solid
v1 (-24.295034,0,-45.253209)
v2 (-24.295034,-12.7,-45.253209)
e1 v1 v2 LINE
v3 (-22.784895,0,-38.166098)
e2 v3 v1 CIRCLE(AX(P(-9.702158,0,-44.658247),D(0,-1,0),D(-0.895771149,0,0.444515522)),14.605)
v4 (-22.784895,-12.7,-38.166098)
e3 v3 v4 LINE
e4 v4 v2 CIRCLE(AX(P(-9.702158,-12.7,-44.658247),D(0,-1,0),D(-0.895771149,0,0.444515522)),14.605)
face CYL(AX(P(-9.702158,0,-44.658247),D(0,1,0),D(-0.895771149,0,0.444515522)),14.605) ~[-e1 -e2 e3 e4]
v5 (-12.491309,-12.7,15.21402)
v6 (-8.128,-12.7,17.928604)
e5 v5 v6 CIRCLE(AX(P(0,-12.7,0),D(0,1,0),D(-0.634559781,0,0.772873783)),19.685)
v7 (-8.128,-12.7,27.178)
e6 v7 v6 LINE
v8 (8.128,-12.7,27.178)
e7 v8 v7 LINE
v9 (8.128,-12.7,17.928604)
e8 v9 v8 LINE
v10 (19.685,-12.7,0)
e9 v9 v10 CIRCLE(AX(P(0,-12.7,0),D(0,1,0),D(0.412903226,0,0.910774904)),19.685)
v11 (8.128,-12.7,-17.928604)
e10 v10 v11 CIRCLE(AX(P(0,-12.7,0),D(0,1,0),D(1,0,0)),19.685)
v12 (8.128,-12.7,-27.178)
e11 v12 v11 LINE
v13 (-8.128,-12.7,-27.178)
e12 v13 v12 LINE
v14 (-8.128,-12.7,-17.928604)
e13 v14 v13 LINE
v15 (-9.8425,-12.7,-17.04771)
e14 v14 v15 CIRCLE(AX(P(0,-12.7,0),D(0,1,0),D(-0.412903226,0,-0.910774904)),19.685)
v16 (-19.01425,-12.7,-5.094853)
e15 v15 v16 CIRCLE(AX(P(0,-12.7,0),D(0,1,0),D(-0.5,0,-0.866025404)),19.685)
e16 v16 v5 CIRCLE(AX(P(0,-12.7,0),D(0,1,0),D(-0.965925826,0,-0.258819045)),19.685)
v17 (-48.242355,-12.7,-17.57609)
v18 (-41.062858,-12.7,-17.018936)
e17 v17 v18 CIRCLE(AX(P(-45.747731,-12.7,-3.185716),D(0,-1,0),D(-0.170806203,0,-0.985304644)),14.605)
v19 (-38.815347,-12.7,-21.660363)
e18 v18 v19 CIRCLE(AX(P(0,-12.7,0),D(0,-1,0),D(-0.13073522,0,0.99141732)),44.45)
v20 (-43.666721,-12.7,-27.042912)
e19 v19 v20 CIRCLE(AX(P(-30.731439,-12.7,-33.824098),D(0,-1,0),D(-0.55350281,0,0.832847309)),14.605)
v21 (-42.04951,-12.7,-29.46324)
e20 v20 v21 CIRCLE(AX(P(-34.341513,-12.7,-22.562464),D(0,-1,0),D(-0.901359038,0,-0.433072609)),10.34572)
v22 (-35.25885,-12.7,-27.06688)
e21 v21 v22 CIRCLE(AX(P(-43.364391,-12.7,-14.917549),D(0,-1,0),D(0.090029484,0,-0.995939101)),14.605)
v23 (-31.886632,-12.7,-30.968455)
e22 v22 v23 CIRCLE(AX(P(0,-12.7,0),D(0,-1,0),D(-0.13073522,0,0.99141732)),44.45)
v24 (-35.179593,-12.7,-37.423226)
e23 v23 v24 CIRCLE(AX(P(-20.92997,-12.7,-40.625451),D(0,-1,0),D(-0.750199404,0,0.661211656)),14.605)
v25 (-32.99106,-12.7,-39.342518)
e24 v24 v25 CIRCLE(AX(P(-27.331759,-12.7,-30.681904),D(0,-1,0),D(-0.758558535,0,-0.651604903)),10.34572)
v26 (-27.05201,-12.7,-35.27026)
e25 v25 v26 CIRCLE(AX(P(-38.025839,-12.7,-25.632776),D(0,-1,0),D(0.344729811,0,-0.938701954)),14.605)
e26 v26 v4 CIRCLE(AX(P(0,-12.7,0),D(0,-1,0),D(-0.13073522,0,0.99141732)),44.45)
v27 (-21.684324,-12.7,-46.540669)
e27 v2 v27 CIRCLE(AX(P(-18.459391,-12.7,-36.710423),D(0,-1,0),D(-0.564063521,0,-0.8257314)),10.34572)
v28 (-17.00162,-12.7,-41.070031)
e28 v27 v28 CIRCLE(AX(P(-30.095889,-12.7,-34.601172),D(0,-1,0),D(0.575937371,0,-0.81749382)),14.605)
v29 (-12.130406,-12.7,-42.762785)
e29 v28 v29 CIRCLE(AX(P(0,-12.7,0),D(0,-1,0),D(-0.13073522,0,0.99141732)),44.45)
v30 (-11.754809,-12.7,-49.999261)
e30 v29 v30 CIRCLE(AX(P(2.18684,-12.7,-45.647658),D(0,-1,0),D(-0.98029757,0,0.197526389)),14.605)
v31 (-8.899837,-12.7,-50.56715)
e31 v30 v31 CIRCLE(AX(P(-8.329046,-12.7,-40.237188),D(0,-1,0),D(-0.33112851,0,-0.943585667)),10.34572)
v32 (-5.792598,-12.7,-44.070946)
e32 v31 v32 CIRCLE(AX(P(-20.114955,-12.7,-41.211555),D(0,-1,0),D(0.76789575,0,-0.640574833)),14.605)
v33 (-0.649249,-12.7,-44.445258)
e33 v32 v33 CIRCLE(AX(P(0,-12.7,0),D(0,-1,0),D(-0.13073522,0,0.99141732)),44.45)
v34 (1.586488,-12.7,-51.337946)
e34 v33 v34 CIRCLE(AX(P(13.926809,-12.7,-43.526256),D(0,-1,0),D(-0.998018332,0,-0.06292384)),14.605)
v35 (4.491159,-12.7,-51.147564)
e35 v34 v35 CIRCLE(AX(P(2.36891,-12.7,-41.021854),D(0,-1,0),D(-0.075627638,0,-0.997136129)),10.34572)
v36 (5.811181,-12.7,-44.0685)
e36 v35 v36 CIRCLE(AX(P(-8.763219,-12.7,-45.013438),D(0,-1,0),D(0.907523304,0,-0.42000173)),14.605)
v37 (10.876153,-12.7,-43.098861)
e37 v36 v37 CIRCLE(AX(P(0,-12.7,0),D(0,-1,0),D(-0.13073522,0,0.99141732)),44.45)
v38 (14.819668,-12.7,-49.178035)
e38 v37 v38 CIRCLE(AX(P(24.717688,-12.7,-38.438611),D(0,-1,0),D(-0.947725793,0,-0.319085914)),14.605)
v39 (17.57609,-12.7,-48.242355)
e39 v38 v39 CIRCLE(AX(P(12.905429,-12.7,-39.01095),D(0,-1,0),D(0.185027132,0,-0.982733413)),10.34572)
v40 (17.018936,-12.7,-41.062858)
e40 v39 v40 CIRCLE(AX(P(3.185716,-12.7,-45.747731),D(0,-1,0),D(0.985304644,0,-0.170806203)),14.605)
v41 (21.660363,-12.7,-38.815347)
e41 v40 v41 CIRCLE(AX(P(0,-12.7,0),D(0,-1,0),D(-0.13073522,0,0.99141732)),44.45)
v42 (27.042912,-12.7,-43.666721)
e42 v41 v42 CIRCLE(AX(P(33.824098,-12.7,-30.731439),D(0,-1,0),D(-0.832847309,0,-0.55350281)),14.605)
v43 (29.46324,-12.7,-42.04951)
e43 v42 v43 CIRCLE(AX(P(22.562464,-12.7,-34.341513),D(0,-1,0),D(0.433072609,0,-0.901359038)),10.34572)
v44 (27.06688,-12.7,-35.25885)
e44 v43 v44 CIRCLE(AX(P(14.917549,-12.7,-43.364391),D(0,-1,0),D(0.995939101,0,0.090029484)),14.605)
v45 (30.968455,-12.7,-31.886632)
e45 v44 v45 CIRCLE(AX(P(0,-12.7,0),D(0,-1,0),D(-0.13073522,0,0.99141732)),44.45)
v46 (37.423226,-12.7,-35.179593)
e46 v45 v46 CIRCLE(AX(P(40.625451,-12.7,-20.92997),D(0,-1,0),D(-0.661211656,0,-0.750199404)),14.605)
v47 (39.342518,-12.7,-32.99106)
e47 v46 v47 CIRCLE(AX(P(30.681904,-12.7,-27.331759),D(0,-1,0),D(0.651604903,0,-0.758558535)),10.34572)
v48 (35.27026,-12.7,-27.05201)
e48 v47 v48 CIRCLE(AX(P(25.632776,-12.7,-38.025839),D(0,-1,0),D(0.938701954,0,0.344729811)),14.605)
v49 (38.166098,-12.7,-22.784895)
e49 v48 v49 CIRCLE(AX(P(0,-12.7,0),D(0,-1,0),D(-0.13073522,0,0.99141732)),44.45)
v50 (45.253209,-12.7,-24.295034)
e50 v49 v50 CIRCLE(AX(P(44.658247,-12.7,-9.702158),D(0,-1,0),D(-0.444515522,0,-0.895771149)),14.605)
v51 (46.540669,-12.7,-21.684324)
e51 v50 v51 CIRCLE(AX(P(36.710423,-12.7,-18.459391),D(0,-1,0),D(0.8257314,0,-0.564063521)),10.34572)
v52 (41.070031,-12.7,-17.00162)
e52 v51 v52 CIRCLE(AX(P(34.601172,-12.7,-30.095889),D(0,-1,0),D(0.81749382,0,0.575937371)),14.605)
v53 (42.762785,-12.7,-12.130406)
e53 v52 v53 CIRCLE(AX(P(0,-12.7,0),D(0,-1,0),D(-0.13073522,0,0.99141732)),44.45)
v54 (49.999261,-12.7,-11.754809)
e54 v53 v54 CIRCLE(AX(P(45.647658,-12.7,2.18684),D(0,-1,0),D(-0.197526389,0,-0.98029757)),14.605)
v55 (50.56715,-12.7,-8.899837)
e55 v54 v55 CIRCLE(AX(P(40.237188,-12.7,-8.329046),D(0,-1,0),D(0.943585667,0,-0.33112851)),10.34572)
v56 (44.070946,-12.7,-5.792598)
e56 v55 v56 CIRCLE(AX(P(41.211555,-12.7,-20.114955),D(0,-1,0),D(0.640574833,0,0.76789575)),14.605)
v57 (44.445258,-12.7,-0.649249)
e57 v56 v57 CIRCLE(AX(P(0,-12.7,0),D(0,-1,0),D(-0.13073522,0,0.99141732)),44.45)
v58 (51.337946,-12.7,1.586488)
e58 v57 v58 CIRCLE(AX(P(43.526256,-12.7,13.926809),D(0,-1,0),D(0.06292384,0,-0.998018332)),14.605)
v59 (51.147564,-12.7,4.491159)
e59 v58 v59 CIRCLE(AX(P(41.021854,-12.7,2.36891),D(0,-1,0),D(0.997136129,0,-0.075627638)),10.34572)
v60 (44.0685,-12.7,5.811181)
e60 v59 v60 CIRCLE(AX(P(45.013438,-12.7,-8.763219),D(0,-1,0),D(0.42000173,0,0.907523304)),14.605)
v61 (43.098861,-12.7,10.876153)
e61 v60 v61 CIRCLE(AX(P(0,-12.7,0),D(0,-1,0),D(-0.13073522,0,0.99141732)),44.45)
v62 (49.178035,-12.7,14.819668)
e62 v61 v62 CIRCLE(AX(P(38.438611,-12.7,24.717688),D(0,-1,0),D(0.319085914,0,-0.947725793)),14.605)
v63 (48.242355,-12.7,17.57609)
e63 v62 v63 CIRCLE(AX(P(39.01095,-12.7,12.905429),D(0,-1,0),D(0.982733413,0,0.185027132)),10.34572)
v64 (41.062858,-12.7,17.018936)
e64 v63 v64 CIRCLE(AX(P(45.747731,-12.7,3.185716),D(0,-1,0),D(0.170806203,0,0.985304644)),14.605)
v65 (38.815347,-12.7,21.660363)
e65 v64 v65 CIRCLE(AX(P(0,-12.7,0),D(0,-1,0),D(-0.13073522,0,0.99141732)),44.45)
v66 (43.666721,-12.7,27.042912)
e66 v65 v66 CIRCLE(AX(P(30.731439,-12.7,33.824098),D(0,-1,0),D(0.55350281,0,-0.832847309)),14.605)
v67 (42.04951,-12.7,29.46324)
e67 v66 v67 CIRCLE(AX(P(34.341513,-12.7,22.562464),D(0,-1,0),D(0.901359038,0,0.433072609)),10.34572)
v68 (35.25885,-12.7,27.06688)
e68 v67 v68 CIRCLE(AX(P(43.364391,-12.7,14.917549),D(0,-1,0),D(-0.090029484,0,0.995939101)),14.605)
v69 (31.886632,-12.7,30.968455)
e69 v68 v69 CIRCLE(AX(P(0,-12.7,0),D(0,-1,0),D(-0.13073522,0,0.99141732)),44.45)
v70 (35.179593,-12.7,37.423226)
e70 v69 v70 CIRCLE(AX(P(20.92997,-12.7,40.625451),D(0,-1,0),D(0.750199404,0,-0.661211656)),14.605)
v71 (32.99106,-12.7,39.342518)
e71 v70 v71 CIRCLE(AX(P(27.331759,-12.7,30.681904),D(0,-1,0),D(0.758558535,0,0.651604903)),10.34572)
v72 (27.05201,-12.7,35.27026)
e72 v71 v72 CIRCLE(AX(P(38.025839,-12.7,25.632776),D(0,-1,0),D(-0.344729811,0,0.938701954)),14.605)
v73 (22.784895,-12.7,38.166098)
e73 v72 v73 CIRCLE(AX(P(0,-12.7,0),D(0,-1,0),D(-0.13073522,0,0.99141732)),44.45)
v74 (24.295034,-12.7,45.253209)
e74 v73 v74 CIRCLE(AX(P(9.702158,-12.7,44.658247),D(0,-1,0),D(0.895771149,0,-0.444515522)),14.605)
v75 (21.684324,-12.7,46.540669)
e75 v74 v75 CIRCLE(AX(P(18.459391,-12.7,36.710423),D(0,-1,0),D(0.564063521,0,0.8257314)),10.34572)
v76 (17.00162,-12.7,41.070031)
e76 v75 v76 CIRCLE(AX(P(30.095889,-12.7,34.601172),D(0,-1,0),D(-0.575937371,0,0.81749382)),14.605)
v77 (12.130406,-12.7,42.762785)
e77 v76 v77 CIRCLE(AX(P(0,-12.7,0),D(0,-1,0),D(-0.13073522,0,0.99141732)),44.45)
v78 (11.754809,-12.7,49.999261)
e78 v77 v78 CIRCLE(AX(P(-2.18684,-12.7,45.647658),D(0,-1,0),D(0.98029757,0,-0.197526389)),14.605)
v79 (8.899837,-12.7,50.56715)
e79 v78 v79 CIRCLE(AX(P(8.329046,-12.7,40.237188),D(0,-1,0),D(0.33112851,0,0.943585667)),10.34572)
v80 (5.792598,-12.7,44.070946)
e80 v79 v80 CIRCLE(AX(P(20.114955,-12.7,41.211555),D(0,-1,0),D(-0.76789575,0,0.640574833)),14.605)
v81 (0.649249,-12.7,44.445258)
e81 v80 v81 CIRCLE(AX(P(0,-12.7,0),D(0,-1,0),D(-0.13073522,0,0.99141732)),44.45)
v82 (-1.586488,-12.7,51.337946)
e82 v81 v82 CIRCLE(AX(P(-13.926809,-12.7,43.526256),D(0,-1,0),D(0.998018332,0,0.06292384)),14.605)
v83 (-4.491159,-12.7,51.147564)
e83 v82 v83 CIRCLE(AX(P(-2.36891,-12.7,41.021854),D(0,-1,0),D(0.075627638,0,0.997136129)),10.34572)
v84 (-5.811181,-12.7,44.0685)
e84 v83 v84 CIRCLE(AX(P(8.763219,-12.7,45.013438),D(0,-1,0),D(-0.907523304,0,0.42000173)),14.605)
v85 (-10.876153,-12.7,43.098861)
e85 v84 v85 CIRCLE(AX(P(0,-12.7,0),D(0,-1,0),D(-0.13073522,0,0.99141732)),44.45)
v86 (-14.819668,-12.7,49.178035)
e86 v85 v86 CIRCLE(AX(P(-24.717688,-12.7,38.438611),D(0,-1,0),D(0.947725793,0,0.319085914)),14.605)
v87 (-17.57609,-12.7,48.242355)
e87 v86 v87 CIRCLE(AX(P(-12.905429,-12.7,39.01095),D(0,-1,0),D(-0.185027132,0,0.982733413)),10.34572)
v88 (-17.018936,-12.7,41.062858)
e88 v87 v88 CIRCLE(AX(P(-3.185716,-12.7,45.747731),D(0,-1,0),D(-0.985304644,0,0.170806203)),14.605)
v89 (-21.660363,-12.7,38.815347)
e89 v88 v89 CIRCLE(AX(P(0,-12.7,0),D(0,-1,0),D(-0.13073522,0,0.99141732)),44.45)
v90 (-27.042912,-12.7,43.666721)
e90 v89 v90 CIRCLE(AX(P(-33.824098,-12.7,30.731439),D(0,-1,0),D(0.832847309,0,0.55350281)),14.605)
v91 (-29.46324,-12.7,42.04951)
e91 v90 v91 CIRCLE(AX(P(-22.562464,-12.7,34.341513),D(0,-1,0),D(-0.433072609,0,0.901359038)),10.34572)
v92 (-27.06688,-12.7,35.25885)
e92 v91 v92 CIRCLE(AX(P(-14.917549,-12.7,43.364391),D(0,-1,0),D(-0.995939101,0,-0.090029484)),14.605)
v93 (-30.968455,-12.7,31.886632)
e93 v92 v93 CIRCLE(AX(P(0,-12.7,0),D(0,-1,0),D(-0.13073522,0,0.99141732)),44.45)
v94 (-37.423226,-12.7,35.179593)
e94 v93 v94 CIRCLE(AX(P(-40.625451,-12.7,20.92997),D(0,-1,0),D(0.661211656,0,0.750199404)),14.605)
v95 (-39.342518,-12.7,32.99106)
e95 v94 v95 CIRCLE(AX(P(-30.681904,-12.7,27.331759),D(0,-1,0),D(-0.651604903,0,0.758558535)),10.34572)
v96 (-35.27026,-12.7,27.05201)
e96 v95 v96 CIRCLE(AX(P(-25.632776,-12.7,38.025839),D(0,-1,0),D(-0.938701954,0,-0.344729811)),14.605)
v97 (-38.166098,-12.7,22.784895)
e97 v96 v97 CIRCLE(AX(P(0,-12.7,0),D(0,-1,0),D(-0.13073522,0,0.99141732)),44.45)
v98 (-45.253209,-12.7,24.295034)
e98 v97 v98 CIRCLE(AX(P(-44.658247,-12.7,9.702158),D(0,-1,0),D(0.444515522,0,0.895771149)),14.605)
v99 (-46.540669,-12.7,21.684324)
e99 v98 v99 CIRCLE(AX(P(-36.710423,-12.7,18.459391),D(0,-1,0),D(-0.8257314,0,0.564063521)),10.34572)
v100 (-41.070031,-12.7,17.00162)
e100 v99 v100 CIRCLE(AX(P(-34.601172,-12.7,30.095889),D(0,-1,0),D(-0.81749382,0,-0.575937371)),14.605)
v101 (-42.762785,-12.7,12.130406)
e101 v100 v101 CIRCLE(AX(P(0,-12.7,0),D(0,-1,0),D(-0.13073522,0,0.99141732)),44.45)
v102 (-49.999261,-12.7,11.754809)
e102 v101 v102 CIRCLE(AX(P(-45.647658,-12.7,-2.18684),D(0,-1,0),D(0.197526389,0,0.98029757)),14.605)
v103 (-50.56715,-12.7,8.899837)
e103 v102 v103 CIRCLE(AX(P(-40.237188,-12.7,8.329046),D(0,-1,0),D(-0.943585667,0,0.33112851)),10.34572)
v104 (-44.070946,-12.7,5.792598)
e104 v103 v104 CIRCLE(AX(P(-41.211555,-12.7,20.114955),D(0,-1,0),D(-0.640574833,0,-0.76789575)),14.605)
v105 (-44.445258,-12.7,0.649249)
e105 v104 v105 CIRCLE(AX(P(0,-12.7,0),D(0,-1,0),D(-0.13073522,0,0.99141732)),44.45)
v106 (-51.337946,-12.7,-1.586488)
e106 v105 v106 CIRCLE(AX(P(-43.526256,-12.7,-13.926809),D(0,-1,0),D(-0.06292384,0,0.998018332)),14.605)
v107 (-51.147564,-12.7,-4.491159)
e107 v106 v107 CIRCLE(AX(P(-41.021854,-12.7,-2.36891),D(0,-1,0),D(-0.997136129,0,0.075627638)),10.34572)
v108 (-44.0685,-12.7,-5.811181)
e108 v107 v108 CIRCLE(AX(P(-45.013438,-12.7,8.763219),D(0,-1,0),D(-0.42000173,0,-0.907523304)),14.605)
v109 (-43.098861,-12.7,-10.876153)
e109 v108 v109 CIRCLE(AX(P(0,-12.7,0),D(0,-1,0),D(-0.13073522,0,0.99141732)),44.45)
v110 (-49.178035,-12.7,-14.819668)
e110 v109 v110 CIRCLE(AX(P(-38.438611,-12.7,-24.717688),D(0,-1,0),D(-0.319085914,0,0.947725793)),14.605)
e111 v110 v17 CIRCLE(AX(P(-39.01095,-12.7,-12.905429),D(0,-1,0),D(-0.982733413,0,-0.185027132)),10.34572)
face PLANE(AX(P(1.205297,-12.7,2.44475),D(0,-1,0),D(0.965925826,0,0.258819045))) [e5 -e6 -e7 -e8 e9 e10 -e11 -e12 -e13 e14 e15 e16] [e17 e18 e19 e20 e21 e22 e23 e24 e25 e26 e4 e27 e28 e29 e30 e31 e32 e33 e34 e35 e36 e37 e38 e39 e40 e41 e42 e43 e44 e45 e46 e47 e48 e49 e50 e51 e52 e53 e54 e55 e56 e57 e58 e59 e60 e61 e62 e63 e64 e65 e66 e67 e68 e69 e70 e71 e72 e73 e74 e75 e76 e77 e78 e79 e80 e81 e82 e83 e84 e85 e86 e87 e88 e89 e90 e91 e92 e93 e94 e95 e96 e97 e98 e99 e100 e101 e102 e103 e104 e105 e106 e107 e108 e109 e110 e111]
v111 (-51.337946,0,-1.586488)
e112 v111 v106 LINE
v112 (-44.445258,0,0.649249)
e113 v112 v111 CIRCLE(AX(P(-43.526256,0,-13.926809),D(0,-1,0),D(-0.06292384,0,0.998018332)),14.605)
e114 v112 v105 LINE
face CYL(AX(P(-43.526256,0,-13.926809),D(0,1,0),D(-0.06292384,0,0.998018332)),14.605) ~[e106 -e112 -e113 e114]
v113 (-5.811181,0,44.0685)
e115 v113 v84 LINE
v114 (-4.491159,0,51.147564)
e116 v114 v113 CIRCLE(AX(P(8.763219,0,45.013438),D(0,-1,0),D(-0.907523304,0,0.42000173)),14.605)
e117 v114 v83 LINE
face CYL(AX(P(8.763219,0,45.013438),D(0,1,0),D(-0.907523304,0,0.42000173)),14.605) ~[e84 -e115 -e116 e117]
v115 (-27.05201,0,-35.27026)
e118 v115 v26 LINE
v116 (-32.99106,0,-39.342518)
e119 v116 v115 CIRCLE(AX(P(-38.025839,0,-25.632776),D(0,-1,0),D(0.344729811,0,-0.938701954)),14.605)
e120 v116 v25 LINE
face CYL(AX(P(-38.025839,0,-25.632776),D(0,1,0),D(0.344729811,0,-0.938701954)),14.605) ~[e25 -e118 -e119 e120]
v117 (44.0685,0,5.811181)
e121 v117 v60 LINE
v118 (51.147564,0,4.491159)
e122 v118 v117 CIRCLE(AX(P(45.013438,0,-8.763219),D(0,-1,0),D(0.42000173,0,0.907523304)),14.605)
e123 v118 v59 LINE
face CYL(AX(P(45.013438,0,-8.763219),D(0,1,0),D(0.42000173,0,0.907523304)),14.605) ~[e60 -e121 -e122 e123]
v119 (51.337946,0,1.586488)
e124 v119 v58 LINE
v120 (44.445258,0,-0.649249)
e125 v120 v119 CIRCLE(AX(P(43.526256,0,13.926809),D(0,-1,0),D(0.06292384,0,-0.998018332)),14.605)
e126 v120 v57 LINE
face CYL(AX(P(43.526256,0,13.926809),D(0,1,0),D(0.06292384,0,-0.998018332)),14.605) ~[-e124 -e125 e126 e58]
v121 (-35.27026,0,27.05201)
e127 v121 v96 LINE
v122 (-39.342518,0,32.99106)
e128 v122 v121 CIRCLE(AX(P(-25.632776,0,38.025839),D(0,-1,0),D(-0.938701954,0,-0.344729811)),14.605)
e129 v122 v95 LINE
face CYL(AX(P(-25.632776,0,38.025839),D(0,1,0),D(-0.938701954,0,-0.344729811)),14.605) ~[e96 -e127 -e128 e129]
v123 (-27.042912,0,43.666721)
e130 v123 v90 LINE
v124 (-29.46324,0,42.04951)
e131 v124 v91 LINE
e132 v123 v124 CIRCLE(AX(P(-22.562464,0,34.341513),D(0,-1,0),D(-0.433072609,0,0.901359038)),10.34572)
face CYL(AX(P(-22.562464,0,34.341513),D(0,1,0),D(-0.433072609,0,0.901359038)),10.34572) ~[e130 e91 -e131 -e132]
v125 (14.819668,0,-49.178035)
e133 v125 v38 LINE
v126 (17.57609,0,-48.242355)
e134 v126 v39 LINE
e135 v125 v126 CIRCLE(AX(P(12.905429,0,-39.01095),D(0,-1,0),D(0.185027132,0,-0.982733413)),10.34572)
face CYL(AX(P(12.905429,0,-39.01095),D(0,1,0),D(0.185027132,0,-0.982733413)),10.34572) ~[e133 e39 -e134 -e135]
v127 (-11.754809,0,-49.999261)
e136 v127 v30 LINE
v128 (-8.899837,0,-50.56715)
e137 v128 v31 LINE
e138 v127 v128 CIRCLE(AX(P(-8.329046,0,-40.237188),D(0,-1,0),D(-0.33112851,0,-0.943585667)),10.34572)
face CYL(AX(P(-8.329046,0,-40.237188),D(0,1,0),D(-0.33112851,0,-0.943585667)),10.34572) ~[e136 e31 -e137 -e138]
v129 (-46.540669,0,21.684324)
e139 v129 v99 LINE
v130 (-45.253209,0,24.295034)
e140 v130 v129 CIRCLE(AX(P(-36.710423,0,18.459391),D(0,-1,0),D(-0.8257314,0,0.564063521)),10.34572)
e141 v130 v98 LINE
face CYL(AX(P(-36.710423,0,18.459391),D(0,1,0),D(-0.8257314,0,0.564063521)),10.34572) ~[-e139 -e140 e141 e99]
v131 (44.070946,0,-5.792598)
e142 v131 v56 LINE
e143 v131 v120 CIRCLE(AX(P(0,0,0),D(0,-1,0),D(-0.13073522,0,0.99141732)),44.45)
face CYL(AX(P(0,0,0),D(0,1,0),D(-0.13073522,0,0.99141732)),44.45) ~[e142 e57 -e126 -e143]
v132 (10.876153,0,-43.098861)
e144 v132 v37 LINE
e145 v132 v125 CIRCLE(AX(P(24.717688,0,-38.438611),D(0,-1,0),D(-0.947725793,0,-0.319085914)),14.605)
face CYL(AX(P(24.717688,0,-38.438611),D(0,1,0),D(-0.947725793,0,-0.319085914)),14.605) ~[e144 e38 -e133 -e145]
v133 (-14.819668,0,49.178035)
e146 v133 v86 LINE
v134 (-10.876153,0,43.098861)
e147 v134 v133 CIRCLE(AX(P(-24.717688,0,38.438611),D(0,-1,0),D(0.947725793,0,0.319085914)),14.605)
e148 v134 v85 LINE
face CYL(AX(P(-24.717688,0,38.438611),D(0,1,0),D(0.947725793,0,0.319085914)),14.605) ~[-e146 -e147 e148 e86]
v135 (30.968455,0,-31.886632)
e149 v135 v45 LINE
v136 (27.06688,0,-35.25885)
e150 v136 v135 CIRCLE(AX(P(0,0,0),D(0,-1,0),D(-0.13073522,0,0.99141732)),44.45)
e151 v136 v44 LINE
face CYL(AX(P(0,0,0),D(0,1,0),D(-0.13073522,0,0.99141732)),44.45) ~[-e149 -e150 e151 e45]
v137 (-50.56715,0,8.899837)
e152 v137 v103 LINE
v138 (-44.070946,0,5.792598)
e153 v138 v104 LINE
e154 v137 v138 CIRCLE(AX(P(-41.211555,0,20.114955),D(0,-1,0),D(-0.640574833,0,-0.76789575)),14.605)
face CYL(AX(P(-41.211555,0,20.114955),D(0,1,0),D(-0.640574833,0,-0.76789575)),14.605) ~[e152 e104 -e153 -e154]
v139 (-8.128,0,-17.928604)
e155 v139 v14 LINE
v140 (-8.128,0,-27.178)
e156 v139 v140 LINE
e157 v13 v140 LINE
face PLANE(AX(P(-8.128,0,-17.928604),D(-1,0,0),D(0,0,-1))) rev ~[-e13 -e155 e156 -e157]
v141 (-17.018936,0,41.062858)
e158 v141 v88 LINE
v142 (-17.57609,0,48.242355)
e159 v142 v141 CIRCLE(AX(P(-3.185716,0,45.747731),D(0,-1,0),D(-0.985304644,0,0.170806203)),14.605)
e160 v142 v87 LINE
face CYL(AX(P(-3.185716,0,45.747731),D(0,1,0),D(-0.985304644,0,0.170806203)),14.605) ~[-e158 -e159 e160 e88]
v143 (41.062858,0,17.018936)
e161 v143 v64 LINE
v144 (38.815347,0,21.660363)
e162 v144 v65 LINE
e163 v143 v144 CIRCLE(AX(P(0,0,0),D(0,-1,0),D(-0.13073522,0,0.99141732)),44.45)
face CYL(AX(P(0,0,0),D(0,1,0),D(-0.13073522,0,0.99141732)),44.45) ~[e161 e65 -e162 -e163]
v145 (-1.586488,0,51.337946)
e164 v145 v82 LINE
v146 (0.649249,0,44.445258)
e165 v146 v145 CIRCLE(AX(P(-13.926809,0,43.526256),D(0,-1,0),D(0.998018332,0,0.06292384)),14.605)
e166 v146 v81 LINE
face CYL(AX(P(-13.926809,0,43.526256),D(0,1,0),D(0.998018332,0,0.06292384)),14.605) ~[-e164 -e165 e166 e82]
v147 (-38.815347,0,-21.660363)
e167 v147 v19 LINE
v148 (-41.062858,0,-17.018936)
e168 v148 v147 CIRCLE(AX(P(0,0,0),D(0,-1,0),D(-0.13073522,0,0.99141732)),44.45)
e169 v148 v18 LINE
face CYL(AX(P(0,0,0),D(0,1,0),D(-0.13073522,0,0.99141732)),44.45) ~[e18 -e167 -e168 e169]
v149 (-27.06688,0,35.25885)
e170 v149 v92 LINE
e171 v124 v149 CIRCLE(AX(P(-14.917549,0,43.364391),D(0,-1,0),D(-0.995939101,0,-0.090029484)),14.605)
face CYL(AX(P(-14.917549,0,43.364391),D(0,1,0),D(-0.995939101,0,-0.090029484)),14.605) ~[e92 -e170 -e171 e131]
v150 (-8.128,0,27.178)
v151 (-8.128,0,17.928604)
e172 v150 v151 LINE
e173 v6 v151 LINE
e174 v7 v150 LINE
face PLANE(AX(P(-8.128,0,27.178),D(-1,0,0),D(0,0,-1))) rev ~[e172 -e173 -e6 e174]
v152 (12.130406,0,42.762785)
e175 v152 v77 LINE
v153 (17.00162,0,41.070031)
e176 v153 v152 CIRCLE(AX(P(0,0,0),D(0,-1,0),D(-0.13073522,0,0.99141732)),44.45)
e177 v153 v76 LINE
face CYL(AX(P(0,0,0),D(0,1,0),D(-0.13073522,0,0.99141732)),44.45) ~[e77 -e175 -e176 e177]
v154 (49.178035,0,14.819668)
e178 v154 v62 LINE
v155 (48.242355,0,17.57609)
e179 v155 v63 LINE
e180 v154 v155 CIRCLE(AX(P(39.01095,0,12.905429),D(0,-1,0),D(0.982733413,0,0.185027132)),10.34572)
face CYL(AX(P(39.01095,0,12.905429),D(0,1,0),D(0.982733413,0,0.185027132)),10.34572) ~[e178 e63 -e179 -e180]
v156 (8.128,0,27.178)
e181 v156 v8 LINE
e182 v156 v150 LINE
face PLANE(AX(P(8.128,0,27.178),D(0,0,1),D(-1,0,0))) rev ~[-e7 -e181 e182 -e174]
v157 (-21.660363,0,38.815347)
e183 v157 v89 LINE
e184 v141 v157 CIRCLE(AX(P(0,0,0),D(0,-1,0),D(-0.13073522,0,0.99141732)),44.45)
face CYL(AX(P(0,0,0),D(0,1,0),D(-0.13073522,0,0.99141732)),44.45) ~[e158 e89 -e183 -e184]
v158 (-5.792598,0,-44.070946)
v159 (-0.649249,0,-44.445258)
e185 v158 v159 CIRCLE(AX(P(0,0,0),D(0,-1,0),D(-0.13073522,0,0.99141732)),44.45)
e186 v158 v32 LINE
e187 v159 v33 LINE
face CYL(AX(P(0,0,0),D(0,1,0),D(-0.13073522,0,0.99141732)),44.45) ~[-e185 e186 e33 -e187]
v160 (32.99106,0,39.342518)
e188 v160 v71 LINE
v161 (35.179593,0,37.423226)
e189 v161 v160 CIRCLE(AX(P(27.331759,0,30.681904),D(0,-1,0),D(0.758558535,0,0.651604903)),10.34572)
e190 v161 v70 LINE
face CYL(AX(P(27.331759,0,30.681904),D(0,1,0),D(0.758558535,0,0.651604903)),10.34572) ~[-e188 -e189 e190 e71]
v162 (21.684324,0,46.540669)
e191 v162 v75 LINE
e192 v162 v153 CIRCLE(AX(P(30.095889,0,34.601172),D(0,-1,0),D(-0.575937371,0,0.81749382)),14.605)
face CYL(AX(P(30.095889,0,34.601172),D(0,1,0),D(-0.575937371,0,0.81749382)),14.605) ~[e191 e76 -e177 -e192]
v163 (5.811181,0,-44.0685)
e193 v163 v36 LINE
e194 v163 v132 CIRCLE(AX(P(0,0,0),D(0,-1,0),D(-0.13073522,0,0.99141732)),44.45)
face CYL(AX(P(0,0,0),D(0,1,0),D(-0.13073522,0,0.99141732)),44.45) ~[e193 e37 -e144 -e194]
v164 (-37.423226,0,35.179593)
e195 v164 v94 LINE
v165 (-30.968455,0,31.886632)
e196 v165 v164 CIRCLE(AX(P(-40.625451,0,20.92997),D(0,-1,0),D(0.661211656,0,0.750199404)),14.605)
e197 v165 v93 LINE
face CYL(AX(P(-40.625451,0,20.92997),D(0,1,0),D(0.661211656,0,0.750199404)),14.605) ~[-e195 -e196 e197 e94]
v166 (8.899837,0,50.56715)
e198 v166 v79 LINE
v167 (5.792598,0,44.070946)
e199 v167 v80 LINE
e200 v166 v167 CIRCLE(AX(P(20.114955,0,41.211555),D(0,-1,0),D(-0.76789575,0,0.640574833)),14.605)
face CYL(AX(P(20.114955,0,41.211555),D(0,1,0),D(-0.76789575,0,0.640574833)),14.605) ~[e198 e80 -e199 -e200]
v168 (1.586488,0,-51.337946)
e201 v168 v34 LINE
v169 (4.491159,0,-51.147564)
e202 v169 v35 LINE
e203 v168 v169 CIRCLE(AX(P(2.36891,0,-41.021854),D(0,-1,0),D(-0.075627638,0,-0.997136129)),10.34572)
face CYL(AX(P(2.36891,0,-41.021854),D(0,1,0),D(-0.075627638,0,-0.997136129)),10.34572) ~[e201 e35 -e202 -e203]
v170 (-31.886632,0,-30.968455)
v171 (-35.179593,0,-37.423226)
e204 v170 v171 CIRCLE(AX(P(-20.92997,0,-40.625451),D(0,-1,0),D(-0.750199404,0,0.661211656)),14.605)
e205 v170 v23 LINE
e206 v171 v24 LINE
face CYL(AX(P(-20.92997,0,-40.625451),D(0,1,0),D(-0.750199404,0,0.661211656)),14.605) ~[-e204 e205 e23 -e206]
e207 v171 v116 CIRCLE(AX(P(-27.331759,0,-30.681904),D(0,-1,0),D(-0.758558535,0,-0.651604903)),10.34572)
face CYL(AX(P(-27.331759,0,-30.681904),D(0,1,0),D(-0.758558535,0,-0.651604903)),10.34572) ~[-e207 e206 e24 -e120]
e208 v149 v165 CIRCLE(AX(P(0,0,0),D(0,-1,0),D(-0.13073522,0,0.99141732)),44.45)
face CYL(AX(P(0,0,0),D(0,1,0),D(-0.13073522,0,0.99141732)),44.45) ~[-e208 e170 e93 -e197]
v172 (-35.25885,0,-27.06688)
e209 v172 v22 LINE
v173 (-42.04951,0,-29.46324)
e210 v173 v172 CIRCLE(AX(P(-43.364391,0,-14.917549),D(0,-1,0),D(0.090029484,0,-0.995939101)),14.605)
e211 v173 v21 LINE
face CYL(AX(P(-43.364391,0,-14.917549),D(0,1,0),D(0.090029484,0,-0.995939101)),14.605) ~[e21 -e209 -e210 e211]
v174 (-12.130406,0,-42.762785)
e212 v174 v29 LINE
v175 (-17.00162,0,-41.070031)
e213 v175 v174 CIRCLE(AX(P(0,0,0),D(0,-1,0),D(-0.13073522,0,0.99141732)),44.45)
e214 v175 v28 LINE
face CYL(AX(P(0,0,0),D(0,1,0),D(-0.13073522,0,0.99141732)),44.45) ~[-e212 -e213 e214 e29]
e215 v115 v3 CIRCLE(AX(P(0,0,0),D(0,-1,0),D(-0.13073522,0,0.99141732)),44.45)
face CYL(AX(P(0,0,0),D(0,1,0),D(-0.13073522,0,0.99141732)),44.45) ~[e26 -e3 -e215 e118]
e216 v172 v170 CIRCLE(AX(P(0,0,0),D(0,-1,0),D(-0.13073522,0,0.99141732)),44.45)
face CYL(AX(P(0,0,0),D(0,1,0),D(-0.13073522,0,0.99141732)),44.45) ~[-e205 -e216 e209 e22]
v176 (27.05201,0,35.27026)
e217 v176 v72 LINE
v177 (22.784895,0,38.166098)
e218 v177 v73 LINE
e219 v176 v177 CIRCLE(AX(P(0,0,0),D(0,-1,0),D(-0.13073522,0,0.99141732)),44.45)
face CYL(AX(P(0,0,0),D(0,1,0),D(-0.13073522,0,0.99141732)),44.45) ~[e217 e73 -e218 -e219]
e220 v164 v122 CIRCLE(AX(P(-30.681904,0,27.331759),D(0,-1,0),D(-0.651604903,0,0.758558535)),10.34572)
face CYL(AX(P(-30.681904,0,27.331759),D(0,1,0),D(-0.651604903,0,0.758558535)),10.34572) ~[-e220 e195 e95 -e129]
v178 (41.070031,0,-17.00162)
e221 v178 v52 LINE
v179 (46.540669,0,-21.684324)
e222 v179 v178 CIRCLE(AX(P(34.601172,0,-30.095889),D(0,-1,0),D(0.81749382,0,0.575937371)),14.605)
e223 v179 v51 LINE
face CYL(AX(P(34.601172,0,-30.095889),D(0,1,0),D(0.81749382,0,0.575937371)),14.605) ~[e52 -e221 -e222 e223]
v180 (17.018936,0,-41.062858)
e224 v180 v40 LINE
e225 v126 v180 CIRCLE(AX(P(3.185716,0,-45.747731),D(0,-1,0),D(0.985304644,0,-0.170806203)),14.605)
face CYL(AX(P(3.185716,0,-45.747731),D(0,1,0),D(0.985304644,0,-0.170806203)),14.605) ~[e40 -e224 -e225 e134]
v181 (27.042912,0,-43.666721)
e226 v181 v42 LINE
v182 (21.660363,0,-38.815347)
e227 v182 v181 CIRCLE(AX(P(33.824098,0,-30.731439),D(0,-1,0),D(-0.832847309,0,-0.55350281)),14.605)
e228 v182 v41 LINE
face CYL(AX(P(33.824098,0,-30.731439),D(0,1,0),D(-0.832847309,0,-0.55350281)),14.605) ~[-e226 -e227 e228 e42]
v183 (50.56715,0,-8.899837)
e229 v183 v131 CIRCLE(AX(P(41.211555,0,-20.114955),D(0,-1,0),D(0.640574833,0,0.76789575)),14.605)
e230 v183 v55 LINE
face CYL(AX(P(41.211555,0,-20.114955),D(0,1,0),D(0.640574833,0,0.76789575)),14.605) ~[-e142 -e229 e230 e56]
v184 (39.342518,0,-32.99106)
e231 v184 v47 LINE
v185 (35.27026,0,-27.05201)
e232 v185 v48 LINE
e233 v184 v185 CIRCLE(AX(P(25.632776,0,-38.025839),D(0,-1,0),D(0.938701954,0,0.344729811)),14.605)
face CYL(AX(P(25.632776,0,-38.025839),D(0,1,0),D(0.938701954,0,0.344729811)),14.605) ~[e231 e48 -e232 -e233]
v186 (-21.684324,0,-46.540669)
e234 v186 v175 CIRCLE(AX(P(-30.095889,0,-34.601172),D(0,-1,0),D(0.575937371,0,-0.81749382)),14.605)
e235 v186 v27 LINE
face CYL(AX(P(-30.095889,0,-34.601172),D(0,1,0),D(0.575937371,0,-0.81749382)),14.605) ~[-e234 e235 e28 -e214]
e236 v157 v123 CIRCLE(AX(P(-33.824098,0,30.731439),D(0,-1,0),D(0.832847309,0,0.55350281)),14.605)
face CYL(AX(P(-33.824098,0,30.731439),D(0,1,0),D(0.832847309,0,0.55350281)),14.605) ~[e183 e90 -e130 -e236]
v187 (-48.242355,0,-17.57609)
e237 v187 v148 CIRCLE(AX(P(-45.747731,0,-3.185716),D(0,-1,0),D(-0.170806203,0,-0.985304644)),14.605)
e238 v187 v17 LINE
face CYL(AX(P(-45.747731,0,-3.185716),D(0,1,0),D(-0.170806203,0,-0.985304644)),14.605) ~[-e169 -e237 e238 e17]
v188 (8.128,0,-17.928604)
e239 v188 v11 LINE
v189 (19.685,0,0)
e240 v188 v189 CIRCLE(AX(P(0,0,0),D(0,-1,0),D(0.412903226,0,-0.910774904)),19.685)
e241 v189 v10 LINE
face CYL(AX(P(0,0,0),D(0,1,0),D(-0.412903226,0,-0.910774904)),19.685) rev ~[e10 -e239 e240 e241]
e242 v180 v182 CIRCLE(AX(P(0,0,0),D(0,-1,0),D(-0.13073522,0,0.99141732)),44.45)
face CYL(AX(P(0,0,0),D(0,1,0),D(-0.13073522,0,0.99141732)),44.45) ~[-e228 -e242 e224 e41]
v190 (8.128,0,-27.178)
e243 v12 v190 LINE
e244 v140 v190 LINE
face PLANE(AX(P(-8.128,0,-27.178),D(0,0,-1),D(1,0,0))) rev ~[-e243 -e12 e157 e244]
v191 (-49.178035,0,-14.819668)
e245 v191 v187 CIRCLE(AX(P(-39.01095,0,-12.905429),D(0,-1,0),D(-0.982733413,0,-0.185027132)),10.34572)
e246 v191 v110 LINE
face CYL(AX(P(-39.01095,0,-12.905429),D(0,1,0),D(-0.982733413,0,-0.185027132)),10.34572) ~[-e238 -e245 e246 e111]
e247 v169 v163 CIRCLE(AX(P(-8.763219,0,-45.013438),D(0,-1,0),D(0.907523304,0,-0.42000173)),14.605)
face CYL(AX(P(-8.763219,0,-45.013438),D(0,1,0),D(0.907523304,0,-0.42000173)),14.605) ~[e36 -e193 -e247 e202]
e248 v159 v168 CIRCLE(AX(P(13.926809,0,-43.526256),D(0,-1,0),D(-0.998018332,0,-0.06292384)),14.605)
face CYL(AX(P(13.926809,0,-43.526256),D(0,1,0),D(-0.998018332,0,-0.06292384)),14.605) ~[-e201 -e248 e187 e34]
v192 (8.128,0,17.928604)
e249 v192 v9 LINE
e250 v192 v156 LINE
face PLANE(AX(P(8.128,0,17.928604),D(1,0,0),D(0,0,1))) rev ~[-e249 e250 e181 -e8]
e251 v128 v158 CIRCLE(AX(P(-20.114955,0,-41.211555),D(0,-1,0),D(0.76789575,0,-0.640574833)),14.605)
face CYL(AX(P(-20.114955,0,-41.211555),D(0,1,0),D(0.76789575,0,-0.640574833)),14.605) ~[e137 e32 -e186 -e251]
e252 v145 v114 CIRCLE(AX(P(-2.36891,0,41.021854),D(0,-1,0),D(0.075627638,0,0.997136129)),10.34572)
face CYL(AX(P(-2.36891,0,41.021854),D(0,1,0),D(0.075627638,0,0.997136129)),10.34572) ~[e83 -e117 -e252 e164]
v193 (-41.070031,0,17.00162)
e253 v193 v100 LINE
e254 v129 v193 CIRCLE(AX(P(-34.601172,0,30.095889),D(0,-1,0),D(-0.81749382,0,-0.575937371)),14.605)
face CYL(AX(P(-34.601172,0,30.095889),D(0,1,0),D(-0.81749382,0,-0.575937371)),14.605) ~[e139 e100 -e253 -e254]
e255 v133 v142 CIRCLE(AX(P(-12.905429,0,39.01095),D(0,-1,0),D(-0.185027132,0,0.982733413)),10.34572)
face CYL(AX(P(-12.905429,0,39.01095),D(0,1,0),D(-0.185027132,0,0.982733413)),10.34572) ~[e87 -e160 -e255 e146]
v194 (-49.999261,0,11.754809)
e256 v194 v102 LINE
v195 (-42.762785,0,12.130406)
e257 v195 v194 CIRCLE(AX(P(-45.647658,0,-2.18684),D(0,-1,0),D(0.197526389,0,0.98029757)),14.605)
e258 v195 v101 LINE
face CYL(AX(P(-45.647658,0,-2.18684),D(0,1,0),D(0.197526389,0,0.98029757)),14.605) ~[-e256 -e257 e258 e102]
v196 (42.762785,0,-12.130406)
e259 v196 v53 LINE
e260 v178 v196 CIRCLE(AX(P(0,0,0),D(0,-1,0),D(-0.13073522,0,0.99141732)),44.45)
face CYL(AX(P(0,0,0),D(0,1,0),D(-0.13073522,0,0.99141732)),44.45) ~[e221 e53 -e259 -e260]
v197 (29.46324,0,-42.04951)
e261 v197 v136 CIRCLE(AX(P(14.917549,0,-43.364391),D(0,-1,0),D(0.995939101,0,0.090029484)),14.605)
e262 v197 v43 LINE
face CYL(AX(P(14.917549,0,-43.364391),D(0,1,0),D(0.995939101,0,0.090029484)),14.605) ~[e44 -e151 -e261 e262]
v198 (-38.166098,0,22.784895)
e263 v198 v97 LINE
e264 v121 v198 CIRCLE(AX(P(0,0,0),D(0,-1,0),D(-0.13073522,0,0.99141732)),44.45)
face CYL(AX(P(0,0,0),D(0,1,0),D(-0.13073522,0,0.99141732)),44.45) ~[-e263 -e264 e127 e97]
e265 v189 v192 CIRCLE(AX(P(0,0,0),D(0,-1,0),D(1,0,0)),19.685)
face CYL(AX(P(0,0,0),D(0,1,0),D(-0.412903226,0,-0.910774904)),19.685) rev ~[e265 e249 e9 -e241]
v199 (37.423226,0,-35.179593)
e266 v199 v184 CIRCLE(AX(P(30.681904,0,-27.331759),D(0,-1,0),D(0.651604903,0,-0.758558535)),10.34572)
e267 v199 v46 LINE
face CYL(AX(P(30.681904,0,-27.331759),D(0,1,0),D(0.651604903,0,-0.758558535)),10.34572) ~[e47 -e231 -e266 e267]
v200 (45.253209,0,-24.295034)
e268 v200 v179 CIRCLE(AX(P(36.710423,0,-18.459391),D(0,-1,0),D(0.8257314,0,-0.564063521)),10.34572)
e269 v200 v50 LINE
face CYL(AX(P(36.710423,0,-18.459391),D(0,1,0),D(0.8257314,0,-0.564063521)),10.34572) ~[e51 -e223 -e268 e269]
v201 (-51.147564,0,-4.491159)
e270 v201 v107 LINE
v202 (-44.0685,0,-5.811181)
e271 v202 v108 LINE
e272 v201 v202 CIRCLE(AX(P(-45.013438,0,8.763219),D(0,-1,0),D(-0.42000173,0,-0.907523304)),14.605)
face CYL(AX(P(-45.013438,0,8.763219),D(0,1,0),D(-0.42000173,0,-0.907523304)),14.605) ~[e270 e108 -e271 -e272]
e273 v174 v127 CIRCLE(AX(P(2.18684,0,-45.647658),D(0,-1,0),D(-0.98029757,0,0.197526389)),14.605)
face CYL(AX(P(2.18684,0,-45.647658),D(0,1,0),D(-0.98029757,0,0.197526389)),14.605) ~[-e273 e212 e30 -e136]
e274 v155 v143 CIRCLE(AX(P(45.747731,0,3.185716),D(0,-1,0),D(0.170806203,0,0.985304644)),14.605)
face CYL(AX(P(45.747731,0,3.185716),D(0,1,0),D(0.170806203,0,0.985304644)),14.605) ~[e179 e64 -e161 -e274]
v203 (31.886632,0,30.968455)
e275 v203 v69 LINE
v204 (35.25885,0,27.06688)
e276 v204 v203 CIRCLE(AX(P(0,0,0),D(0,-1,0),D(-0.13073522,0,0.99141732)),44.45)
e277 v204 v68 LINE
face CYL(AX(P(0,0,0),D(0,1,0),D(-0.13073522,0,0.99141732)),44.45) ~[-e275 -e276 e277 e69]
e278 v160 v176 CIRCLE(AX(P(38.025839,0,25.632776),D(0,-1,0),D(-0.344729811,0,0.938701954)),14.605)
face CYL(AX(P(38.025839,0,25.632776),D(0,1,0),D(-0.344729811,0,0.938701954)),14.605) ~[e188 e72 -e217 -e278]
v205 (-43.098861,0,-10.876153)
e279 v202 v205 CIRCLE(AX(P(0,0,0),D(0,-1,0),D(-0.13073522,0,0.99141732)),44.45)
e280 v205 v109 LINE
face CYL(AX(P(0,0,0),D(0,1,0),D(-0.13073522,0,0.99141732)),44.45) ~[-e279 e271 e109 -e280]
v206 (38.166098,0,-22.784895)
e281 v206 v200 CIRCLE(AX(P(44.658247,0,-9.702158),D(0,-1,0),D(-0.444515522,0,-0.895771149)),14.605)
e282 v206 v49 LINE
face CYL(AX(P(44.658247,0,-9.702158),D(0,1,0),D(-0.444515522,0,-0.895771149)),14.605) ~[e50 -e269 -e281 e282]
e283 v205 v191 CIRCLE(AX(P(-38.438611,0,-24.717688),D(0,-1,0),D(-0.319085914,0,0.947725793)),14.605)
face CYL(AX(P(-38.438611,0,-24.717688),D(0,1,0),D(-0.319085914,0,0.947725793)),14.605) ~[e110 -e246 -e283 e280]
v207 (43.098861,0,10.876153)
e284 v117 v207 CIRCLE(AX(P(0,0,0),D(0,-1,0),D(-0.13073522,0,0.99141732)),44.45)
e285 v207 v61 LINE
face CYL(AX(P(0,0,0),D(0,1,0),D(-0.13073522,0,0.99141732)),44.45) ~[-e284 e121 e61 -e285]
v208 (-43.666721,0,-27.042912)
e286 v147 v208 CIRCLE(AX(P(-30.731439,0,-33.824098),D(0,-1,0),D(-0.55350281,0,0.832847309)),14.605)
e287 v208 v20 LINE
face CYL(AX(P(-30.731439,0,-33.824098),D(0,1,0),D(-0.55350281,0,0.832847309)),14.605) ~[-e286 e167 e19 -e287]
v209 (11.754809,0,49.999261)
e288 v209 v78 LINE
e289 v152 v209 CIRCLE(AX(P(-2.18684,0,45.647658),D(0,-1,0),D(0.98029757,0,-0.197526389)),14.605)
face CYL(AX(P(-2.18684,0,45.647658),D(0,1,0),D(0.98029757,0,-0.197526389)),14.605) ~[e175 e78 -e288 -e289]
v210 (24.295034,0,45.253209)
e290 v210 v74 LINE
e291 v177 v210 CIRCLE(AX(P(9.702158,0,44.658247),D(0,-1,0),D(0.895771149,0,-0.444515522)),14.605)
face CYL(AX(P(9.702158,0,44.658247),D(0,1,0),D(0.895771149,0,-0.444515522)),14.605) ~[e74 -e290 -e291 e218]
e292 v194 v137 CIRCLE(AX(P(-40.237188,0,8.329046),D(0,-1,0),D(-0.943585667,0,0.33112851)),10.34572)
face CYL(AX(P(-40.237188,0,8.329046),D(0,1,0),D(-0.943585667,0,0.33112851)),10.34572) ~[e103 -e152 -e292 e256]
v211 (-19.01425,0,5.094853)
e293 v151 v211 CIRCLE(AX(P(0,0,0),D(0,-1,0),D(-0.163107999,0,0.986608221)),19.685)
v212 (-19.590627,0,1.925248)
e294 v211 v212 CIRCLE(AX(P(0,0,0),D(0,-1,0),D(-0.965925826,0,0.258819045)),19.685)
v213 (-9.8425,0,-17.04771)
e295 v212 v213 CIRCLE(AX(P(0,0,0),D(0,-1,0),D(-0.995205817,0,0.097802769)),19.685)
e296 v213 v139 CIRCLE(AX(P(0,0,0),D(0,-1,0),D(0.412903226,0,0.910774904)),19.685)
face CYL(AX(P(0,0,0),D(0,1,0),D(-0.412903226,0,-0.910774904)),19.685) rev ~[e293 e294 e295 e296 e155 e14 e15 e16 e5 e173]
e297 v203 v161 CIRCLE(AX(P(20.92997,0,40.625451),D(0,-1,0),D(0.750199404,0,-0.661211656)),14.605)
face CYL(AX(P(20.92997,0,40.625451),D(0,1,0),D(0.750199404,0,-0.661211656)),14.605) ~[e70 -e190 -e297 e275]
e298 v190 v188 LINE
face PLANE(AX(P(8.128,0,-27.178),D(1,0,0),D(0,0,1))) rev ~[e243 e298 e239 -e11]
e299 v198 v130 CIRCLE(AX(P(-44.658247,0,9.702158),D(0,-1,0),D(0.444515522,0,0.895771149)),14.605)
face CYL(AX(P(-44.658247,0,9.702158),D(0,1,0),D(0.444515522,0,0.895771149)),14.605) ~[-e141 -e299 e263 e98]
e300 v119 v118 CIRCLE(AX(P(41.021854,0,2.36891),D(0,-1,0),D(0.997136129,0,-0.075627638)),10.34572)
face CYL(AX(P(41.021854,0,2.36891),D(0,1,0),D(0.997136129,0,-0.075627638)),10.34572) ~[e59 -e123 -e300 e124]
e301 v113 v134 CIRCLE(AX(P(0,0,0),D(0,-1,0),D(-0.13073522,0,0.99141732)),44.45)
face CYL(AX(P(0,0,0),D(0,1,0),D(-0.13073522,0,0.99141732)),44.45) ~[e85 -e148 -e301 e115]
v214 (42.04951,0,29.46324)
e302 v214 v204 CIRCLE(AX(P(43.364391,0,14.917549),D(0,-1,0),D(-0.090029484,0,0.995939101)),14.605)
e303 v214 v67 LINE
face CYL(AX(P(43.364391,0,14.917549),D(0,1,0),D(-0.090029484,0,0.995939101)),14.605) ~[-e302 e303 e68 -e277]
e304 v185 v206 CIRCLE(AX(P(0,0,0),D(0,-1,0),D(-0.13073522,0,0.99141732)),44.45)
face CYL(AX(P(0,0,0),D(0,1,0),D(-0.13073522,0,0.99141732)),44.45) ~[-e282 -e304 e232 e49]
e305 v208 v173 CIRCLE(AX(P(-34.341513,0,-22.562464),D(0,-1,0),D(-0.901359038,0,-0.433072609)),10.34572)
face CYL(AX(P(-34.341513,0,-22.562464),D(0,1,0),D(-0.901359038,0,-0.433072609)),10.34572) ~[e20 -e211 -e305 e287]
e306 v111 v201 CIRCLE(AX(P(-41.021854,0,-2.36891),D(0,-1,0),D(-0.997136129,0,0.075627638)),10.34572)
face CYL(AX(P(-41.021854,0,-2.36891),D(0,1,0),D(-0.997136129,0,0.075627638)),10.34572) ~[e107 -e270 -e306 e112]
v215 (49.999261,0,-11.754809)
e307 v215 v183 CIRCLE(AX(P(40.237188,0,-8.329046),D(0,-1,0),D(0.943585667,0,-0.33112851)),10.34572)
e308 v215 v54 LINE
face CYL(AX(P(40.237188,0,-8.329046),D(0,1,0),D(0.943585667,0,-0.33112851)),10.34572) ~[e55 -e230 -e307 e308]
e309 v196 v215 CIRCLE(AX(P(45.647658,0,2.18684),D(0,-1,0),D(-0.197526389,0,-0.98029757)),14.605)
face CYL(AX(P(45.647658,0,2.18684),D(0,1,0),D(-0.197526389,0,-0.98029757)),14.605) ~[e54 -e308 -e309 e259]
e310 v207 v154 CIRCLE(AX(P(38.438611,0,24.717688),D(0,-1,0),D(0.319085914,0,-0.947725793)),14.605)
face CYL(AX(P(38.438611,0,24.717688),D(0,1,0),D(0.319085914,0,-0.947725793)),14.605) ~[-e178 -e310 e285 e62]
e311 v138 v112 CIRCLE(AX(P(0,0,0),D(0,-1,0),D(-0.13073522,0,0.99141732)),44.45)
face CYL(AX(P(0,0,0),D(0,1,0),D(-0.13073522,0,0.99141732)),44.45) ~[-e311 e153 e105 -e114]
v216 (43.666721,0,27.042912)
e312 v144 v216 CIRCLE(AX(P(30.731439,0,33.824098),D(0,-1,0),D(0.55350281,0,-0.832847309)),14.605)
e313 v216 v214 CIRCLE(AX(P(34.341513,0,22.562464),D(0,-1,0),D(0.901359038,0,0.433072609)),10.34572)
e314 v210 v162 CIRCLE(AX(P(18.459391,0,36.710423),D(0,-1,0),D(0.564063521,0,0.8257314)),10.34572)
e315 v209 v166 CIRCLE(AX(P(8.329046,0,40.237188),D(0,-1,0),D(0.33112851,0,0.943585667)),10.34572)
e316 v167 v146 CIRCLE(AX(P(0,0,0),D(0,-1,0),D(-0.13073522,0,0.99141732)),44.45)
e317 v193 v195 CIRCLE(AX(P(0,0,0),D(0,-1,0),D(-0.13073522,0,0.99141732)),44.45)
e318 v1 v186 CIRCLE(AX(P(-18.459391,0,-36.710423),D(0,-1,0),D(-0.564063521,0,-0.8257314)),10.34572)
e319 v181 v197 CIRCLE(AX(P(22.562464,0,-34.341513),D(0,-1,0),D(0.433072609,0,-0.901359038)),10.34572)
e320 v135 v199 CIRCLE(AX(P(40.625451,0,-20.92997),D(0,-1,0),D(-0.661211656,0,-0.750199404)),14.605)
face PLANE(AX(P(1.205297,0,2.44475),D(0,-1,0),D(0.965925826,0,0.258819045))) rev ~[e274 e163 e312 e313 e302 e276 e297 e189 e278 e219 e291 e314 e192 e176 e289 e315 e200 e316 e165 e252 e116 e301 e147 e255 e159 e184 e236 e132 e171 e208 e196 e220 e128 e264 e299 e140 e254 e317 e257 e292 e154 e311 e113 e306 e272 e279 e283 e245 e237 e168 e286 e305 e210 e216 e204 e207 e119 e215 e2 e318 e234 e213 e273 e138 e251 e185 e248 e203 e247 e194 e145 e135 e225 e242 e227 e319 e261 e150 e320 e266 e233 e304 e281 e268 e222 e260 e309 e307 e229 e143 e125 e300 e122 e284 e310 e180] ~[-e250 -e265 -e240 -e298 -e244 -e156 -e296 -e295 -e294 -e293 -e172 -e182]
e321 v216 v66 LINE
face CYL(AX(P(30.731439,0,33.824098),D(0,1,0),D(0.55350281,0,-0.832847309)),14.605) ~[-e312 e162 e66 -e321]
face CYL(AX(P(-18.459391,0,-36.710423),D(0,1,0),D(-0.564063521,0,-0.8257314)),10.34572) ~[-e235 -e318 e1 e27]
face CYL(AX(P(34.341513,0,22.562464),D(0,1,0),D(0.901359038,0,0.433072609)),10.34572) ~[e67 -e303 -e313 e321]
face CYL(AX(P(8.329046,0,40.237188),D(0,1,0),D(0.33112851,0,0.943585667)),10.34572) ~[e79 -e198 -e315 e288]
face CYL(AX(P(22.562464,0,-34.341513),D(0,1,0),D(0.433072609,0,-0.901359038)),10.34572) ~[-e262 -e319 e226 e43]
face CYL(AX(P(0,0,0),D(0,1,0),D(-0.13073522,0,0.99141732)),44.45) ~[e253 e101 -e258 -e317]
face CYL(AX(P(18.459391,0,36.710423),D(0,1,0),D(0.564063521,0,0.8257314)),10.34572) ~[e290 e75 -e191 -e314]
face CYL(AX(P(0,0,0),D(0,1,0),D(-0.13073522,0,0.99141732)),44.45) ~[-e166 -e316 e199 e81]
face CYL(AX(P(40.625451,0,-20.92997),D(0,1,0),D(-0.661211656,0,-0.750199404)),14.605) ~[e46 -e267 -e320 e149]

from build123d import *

# Parameters (mm, degrees)
F1_DEPTH = 12.7
F2_COUNT = 24
F2_ANGLE = 345
F3_DEPTH = 25.4


# Not quite as in the source:
# - a feature names something its author has since deleted; it is built from what else it names


with BuildPart() as f1:
    # F0 (on Front) → F1 (new body)
    with BuildSketch(Plane.XZ):
        with BuildLine():
            ThreePointArc((-5.81118052, 44.0684998719), (-29.3043983549, -33.4223688128), (44.45, 0))
            ThreePointArc((44.45, 0), (31.6596085179, 31.2005078243), (0.6492491116, 44.4452581902))
            ThreePointArc((0.6492491116, 44.4452581902), (-2.5878312685, 44.3746056808), (-5.81118052, 44.0684998719))
        make_face()
        with BuildLine():
            ThreePointArc((8.128, 17.9286039892), (16.5453755624, 10.6653538385), (19.685, 0))
            ThreePointArc((19.685, 0), (16.5453755624, -10.6653538385), (8.128, -17.9286039892))
            Line((8.128, -17.9286039892), (8.128, -27.178))
            Line((8.128, -27.178), (-8.128, -27.178))
            Line((-8.128, -27.178), (-8.128, -17.9286039892))
            ThreePointArc((-8.128, -17.9286039892), (-19.685, 0), (-8.128, 17.9286039892))
            Line((-8.128, 17.9286039892), (-8.128, 27.178))
            Line((-8.128, 27.178), (8.128, 27.178))
            Line((8.128, 27.178), (8.128, 17.9286039892))
        make_face(mode=Mode.SUBTRACT)
        with BuildLine():
            ThreePointArc((-5.81118052, 44.0684998719), (-2.5878312685, 44.3746056808), (0.6492491116, 44.4452581902))
            ThreePointArc((0.6492491116, 44.4452581902), (-0.0343594341, 48.0324601777), (-1.5864878253, 51.3379459514))
            ThreePointArc((-1.5864878253, 51.3379459514), (-3.0455527066, 51.3454237754), (-4.4911590337, 51.147563742))
            ThreePointArc((-4.4911590337, 51.147563742), (-5.5943052126, 47.6906625485), (-5.81118052, 44.0684998719))
        make_face()
    extrude(amount=F1_DEPTH)

    # F2: F1 ×24 about axis
    f2_axis = Axis((0, 0, 0), (0, 1, 0))


with BuildPart() as f1_1:
    add(f1.part)
    for i in range(1, F2_COUNT):
        add(f1.part.rotate(f2_axis, i * F2_ANGLE / (F2_COUNT - 1)))


with BuildPart() as f3:
    # F0 (on Front) → F3 (new body, symmetric)
    with BuildSketch(Plane.XZ):
        with BuildLine():
            ThreePointArc((-8.128, 17.9286039892), (0, 19.685), (8.128, 17.9286039892))
            Line((8.128, 17.9286039892), (8.128, 27.178))
            Line((8.128, 27.178), (-8.128, 27.178))
            Line((-8.128, 27.178), (-8.128, 17.9286039892))
        make_face()
    extrude(amount=F3_DEPTH, both=True)


with BuildPart() as f3b:
    # F0 (on Front) → F3, piece 2 (new body, symmetric)
    with BuildSketch(Plane.XZ):
        with BuildLine():
            Line((8.128, -27.178), (8.128, -17.9286039892))
            ThreePointArc((8.128, -17.9286039892), (0, -19.685), (-8.128, -17.9286039892))
            Line((-8.128, -17.9286039892), (-8.128, -27.178))
            Line((-8.128, -27.178), (8.128, -27.178))
        make_face()
    extrude(amount=F3_DEPTH, both=True)


with BuildPart() as f1_2:
    add(f1_1.part)

    # F4: cut F3, F3b
    add(f3.part, mode=Mode.SUBTRACT)
    add(f3b.part, mode=Mode.SUBTRACT)


solid = f1_2.part
